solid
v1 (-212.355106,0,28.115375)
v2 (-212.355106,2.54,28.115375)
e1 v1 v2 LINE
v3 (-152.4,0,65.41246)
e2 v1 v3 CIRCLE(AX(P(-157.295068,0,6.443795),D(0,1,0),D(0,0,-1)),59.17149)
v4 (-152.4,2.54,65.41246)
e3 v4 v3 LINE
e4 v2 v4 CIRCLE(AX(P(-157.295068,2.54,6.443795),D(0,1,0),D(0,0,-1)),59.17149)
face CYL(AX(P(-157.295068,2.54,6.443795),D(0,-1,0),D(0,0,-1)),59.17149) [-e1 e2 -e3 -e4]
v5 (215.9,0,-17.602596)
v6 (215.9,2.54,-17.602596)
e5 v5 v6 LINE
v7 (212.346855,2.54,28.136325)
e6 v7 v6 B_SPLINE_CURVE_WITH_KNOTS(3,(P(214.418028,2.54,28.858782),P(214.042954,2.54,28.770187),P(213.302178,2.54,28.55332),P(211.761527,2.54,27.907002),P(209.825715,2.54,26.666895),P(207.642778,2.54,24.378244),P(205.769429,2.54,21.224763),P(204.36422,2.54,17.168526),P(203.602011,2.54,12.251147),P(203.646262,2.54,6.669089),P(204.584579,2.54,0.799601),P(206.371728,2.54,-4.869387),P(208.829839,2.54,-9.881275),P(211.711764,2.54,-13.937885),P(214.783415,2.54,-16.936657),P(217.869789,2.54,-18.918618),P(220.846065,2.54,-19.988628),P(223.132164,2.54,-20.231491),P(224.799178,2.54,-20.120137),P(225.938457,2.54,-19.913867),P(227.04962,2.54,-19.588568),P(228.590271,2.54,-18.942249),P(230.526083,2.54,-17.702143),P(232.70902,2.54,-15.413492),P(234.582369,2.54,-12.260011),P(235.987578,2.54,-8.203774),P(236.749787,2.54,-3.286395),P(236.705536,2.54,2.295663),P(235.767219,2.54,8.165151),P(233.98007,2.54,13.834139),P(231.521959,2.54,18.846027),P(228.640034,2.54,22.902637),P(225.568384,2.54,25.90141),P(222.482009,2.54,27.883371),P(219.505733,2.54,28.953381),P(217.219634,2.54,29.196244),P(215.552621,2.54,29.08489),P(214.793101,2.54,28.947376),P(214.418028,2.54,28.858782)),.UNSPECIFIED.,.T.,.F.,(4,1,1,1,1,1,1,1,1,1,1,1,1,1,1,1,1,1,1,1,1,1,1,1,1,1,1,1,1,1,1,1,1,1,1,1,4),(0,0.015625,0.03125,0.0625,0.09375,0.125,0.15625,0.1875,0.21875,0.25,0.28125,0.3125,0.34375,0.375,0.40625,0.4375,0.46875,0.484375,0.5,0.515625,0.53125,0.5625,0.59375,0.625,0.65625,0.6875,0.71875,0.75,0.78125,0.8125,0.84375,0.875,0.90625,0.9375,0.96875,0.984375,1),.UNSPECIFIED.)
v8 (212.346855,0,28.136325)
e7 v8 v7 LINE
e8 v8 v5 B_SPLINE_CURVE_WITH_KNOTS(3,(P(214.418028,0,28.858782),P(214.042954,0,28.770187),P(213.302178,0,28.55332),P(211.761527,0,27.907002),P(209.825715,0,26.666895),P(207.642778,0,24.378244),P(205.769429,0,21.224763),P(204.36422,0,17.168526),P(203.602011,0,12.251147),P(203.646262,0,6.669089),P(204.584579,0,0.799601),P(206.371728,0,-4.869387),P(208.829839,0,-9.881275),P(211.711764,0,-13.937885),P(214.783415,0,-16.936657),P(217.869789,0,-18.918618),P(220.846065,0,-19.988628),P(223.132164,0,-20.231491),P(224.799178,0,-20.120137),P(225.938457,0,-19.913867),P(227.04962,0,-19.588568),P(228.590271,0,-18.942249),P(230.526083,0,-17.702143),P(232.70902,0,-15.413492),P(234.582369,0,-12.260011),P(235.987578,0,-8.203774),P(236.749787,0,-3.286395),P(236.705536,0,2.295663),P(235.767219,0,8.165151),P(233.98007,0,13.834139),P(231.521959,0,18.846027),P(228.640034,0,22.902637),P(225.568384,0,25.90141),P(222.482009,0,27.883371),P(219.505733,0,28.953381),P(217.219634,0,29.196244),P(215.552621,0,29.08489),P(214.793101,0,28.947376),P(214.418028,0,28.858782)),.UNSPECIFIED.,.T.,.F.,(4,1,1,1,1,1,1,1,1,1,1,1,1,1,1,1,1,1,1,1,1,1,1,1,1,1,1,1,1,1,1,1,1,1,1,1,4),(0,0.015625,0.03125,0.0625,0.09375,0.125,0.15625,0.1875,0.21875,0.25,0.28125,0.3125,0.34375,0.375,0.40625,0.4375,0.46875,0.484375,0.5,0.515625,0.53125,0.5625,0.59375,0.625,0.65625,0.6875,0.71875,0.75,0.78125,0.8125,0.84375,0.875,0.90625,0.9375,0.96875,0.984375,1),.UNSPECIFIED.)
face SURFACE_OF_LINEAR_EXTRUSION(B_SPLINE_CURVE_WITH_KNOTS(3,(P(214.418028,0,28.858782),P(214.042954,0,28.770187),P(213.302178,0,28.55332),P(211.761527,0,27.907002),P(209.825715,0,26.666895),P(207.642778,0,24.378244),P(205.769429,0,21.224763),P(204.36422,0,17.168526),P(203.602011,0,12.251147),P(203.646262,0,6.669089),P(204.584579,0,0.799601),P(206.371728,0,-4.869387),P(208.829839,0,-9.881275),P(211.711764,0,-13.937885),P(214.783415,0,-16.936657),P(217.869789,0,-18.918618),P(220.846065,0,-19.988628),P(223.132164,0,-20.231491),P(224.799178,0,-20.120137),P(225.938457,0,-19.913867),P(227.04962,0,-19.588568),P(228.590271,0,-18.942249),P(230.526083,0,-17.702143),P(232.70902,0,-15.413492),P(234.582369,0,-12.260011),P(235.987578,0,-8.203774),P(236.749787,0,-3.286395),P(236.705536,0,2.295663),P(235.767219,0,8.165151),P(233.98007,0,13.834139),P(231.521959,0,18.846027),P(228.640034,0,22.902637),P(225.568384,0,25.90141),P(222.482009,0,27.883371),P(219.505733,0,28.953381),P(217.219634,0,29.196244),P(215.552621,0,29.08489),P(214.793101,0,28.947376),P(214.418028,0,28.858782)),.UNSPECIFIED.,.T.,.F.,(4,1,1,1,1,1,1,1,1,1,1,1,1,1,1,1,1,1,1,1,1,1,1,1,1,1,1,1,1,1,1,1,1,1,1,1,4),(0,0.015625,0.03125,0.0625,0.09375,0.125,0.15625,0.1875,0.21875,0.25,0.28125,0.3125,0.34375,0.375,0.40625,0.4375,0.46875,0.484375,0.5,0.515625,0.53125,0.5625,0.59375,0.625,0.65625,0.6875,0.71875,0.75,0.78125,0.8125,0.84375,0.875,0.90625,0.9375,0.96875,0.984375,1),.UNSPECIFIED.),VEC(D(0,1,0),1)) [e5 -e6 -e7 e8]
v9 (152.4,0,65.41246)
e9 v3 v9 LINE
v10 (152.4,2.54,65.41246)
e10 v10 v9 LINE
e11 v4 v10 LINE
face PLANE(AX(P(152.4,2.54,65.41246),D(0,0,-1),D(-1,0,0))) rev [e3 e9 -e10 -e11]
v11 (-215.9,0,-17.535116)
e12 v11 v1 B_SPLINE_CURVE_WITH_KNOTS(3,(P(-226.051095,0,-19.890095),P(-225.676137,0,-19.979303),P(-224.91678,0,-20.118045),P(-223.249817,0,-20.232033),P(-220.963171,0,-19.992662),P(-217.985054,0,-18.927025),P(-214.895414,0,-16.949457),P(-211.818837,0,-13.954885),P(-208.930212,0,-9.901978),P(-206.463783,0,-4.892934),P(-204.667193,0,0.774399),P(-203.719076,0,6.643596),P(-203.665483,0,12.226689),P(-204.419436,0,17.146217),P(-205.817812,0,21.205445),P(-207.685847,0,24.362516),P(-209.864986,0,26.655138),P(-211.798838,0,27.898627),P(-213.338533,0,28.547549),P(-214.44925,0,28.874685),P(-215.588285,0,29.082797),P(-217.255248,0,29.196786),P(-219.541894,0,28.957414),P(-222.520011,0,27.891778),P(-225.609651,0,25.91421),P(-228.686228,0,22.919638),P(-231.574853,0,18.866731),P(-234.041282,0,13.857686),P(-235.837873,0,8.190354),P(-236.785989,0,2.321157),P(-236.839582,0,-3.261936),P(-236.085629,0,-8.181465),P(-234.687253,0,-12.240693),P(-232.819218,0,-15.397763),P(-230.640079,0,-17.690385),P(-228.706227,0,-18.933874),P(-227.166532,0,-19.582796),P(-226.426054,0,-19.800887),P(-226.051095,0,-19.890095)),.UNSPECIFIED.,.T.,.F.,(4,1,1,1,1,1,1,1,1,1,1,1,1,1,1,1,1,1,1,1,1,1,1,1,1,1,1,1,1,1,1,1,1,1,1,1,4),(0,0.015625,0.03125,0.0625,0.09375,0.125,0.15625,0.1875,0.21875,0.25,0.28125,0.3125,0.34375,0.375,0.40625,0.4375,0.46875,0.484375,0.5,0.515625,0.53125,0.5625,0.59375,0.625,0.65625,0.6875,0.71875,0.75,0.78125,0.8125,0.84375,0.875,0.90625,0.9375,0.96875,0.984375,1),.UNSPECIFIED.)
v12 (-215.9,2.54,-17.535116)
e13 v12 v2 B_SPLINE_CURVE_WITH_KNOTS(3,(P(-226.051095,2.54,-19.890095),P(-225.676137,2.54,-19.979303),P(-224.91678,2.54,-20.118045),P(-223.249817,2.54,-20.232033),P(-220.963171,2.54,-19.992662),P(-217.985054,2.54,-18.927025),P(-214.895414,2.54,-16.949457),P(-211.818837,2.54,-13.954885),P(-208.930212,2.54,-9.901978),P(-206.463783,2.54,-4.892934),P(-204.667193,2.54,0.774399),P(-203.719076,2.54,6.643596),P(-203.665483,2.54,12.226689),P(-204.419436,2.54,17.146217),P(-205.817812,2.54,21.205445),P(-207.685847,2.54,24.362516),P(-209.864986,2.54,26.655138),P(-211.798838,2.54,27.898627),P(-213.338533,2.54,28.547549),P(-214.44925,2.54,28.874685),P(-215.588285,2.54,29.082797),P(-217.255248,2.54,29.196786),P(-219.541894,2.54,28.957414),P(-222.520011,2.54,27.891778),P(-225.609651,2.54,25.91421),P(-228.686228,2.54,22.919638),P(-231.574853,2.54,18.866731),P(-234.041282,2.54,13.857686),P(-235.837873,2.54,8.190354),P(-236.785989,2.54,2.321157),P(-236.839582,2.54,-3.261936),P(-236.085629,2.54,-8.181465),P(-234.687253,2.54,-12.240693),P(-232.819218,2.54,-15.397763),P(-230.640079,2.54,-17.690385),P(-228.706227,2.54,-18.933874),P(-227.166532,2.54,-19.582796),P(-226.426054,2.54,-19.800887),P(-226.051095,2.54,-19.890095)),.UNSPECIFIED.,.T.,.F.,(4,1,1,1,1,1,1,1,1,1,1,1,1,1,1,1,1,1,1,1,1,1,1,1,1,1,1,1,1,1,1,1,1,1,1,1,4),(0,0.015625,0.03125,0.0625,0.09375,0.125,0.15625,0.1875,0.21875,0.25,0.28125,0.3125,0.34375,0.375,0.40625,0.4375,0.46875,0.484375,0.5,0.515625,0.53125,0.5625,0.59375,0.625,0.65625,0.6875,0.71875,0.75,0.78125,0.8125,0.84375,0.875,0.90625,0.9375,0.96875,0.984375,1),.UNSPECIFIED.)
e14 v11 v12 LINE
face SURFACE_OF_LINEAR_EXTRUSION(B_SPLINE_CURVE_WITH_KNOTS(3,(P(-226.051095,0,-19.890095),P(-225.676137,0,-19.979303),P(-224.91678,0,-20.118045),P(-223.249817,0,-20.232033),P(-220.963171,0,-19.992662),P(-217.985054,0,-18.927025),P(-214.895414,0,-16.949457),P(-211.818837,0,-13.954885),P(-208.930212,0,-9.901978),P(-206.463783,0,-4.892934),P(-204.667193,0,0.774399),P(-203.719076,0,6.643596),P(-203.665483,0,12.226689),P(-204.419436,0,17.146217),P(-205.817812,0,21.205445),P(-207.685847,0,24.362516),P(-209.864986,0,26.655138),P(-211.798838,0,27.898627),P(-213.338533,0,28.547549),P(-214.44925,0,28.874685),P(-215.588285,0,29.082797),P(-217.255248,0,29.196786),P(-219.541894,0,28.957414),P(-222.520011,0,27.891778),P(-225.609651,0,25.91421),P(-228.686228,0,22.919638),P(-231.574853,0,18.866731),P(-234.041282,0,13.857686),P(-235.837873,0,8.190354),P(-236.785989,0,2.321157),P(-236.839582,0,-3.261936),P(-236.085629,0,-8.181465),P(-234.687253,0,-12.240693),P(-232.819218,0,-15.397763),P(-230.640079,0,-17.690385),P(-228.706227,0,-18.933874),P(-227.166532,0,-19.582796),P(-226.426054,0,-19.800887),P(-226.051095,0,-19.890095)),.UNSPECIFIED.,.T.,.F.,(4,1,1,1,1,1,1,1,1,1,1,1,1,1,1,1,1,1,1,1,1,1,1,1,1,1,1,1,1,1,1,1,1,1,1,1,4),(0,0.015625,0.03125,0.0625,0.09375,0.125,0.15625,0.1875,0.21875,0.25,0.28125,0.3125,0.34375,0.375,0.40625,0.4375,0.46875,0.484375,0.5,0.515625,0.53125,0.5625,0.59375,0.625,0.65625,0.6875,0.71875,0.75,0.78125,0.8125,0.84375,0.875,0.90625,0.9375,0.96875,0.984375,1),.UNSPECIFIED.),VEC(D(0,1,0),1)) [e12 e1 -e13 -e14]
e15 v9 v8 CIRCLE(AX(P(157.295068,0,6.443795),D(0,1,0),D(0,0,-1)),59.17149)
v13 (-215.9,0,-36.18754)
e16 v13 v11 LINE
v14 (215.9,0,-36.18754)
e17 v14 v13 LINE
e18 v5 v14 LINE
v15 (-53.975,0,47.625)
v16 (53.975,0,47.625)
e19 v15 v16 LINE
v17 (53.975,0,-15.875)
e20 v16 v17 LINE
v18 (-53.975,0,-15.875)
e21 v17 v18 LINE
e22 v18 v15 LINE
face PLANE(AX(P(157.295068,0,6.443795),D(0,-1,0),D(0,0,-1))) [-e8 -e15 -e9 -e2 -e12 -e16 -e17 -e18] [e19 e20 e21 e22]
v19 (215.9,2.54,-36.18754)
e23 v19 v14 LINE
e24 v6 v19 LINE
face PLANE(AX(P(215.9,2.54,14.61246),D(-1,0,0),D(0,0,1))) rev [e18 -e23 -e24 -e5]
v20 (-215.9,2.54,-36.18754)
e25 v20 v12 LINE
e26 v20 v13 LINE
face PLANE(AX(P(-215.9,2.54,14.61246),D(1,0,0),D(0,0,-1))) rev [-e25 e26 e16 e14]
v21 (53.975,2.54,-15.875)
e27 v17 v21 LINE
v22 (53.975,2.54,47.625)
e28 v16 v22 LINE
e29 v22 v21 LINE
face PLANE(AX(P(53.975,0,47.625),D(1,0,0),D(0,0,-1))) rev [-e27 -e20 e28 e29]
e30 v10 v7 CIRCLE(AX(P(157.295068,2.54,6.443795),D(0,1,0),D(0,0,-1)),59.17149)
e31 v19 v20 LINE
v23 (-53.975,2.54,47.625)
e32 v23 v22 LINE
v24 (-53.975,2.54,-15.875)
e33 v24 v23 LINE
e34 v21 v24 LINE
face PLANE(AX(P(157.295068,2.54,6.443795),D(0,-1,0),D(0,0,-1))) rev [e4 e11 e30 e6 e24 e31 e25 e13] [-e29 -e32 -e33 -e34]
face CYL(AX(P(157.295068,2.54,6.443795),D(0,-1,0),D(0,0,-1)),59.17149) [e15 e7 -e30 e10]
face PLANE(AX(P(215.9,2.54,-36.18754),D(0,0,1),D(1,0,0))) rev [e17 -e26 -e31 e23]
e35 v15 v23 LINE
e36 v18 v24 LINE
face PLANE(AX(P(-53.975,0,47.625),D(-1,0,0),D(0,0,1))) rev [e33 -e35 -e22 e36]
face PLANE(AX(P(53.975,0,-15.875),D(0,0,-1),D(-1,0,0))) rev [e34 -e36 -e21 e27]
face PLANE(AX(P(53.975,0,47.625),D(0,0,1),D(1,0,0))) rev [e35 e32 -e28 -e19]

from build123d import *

# Parameters (mm, degrees)
BOSS_EXTRUDE1_DEPTH = 2.54
SKETCH2_W           = 107.95
SKETCH2_H           = 63.5
CUT_EXTRUDE1_DEPTH  = 226.664855764
CUT_EXTRUDE2_START  = -2.54
CUT_EXTRUDE2_DEPTH  = 2.54


# Read off the part's stored shape, not the designer's step: Cut-Extrude2
with BuildPart() as part:
    # Sketch1 → Boss-Extrude1 (new body)
    with BuildSketch(Plane(origin=(0, 0, 0), x_dir=(1, 0, 0), z_dir=(0, 1, 0))):
        with BuildLine():
            Line((215.9, -14.612459999), (215.9, 36.187540001))
            Line((215.9, 36.187540001), (-215.9, 36.187540001))
            Line((-215.9, 36.187540001), (-215.9, -14.612459999))
            ThreePointArc((-215.9, -14.612459999), (-194.259204241, -52.648965299), (-152.4, -65.412459999))
            Line((-152.4, -65.412459999), (152.4, -65.412459999))
            ThreePointArc((152.4, -65.412459999), (194.259204241, -52.648965299), (215.9, -14.612459999))
        make_face()
    extrude(amount=BOSS_EXTRUDE1_DEPTH)

    # Sketch2 → Cut-Extrude1 (cut, through all)
    with BuildSketch(Plane(origin=(0, 2.54, 0), x_dir=(1, 0, 0), z_dir=(0, 1, 0))):
        with Locations((0, -15.875)):
            Rectangle(SKETCH2_W, SKETCH2_H)
    extrude(amount=-CUT_EXTRUDE1_DEPTH, mode=Mode.SUBTRACT)

    # Cut-Extrude2 outline → Cut-Extrude2 (cut)
    with BuildSketch(Plane(origin=(0, 2.54, 0), x_dir=(1, 0, 0), z_dir=(0, 1, 0)).offset(CUT_EXTRUDE2_START)):
        with BuildLine():
            add(Edge.make_bspline(
                [(-215.899999994, 17.535115527), (-215.566109371, 17.300913161), (-214.20332449, 16.275815014), (-211.81883724, 13.954885046), (-208.930212321, 9.901978384), (-206.463783195, 4.892933776), (-204.667192604, -0.774398824), (-203.719076257, -6.643595697), (-203.665482888, -12.226688771), (-204.419435916, -17.146217321), (-205.817811739, -21.205445303), (-207.685847242, -24.362515926), (-209.864985661, -26.655137817), (-211.469591298, -27.686917669), (-212.297814145, -28.088227647), (-212.355105742, -28.115375011)],
                knots=[0.114839475, 0.114839475, 0.114839475, 0.114839475, 0.125, 0.15625, 0.1875, 0.21875, 0.25, 0.28125, 0.3125, 0.34375, 0.375, 0.40625, 0.4375, 0.46875, 0.471073894, 0.471073894, 0.471073894, 0.471073894], degree=3))
            Line((-215.899999994, 17.535115527), (-215.9, -14.612459999))
            ThreePointArc((-215.9, -14.612459999), (-214.527170136, -21.468828255), (-212.355105742, -28.115375011))
        make_face()
        with BuildLine():
            add(Edge.make_bspline(
                [(212.34685517, -28.136325182), (212.279954773, -28.104999749), (211.441572028, -27.702034349), (209.825715206, -26.66689516), (207.64277821, -24.378244073), (205.76942942, -21.224763186), (204.364219868, -17.16852613), (203.602011314, -12.251147017), (203.646262202, -6.669088999), (204.584578872, -0.799601085), (206.371728131, 4.869386838), (208.829838854, 9.881274858), (211.711764265, 13.937884913), (214.130027538, 16.298772476), (215.528958726, 17.345764848), (215.899999994, 17.602596054)],
                knots=[0.028537672, 0.028537672, 0.028537672, 0.028537672, 0.03125, 0.0625, 0.09375, 0.125, 0.15625, 0.1875, 0.21875, 0.25, 0.28125, 0.3125, 0.34375, 0.375, 0.386307936, 0.386307936, 0.386307936, 0.386307936], degree=3))
            ThreePointArc((212.34685517, -28.136325182), (214.524310397, -21.479717116), (215.9, -14.612459999))
            Line((215.9, -14.612459999), (215.899999994, 17.602596054))
        make_face()
    extrude(amount=CUT_EXTRUDE2_DEPTH, mode=Mode.SUBTRACT)


solid = part.part
